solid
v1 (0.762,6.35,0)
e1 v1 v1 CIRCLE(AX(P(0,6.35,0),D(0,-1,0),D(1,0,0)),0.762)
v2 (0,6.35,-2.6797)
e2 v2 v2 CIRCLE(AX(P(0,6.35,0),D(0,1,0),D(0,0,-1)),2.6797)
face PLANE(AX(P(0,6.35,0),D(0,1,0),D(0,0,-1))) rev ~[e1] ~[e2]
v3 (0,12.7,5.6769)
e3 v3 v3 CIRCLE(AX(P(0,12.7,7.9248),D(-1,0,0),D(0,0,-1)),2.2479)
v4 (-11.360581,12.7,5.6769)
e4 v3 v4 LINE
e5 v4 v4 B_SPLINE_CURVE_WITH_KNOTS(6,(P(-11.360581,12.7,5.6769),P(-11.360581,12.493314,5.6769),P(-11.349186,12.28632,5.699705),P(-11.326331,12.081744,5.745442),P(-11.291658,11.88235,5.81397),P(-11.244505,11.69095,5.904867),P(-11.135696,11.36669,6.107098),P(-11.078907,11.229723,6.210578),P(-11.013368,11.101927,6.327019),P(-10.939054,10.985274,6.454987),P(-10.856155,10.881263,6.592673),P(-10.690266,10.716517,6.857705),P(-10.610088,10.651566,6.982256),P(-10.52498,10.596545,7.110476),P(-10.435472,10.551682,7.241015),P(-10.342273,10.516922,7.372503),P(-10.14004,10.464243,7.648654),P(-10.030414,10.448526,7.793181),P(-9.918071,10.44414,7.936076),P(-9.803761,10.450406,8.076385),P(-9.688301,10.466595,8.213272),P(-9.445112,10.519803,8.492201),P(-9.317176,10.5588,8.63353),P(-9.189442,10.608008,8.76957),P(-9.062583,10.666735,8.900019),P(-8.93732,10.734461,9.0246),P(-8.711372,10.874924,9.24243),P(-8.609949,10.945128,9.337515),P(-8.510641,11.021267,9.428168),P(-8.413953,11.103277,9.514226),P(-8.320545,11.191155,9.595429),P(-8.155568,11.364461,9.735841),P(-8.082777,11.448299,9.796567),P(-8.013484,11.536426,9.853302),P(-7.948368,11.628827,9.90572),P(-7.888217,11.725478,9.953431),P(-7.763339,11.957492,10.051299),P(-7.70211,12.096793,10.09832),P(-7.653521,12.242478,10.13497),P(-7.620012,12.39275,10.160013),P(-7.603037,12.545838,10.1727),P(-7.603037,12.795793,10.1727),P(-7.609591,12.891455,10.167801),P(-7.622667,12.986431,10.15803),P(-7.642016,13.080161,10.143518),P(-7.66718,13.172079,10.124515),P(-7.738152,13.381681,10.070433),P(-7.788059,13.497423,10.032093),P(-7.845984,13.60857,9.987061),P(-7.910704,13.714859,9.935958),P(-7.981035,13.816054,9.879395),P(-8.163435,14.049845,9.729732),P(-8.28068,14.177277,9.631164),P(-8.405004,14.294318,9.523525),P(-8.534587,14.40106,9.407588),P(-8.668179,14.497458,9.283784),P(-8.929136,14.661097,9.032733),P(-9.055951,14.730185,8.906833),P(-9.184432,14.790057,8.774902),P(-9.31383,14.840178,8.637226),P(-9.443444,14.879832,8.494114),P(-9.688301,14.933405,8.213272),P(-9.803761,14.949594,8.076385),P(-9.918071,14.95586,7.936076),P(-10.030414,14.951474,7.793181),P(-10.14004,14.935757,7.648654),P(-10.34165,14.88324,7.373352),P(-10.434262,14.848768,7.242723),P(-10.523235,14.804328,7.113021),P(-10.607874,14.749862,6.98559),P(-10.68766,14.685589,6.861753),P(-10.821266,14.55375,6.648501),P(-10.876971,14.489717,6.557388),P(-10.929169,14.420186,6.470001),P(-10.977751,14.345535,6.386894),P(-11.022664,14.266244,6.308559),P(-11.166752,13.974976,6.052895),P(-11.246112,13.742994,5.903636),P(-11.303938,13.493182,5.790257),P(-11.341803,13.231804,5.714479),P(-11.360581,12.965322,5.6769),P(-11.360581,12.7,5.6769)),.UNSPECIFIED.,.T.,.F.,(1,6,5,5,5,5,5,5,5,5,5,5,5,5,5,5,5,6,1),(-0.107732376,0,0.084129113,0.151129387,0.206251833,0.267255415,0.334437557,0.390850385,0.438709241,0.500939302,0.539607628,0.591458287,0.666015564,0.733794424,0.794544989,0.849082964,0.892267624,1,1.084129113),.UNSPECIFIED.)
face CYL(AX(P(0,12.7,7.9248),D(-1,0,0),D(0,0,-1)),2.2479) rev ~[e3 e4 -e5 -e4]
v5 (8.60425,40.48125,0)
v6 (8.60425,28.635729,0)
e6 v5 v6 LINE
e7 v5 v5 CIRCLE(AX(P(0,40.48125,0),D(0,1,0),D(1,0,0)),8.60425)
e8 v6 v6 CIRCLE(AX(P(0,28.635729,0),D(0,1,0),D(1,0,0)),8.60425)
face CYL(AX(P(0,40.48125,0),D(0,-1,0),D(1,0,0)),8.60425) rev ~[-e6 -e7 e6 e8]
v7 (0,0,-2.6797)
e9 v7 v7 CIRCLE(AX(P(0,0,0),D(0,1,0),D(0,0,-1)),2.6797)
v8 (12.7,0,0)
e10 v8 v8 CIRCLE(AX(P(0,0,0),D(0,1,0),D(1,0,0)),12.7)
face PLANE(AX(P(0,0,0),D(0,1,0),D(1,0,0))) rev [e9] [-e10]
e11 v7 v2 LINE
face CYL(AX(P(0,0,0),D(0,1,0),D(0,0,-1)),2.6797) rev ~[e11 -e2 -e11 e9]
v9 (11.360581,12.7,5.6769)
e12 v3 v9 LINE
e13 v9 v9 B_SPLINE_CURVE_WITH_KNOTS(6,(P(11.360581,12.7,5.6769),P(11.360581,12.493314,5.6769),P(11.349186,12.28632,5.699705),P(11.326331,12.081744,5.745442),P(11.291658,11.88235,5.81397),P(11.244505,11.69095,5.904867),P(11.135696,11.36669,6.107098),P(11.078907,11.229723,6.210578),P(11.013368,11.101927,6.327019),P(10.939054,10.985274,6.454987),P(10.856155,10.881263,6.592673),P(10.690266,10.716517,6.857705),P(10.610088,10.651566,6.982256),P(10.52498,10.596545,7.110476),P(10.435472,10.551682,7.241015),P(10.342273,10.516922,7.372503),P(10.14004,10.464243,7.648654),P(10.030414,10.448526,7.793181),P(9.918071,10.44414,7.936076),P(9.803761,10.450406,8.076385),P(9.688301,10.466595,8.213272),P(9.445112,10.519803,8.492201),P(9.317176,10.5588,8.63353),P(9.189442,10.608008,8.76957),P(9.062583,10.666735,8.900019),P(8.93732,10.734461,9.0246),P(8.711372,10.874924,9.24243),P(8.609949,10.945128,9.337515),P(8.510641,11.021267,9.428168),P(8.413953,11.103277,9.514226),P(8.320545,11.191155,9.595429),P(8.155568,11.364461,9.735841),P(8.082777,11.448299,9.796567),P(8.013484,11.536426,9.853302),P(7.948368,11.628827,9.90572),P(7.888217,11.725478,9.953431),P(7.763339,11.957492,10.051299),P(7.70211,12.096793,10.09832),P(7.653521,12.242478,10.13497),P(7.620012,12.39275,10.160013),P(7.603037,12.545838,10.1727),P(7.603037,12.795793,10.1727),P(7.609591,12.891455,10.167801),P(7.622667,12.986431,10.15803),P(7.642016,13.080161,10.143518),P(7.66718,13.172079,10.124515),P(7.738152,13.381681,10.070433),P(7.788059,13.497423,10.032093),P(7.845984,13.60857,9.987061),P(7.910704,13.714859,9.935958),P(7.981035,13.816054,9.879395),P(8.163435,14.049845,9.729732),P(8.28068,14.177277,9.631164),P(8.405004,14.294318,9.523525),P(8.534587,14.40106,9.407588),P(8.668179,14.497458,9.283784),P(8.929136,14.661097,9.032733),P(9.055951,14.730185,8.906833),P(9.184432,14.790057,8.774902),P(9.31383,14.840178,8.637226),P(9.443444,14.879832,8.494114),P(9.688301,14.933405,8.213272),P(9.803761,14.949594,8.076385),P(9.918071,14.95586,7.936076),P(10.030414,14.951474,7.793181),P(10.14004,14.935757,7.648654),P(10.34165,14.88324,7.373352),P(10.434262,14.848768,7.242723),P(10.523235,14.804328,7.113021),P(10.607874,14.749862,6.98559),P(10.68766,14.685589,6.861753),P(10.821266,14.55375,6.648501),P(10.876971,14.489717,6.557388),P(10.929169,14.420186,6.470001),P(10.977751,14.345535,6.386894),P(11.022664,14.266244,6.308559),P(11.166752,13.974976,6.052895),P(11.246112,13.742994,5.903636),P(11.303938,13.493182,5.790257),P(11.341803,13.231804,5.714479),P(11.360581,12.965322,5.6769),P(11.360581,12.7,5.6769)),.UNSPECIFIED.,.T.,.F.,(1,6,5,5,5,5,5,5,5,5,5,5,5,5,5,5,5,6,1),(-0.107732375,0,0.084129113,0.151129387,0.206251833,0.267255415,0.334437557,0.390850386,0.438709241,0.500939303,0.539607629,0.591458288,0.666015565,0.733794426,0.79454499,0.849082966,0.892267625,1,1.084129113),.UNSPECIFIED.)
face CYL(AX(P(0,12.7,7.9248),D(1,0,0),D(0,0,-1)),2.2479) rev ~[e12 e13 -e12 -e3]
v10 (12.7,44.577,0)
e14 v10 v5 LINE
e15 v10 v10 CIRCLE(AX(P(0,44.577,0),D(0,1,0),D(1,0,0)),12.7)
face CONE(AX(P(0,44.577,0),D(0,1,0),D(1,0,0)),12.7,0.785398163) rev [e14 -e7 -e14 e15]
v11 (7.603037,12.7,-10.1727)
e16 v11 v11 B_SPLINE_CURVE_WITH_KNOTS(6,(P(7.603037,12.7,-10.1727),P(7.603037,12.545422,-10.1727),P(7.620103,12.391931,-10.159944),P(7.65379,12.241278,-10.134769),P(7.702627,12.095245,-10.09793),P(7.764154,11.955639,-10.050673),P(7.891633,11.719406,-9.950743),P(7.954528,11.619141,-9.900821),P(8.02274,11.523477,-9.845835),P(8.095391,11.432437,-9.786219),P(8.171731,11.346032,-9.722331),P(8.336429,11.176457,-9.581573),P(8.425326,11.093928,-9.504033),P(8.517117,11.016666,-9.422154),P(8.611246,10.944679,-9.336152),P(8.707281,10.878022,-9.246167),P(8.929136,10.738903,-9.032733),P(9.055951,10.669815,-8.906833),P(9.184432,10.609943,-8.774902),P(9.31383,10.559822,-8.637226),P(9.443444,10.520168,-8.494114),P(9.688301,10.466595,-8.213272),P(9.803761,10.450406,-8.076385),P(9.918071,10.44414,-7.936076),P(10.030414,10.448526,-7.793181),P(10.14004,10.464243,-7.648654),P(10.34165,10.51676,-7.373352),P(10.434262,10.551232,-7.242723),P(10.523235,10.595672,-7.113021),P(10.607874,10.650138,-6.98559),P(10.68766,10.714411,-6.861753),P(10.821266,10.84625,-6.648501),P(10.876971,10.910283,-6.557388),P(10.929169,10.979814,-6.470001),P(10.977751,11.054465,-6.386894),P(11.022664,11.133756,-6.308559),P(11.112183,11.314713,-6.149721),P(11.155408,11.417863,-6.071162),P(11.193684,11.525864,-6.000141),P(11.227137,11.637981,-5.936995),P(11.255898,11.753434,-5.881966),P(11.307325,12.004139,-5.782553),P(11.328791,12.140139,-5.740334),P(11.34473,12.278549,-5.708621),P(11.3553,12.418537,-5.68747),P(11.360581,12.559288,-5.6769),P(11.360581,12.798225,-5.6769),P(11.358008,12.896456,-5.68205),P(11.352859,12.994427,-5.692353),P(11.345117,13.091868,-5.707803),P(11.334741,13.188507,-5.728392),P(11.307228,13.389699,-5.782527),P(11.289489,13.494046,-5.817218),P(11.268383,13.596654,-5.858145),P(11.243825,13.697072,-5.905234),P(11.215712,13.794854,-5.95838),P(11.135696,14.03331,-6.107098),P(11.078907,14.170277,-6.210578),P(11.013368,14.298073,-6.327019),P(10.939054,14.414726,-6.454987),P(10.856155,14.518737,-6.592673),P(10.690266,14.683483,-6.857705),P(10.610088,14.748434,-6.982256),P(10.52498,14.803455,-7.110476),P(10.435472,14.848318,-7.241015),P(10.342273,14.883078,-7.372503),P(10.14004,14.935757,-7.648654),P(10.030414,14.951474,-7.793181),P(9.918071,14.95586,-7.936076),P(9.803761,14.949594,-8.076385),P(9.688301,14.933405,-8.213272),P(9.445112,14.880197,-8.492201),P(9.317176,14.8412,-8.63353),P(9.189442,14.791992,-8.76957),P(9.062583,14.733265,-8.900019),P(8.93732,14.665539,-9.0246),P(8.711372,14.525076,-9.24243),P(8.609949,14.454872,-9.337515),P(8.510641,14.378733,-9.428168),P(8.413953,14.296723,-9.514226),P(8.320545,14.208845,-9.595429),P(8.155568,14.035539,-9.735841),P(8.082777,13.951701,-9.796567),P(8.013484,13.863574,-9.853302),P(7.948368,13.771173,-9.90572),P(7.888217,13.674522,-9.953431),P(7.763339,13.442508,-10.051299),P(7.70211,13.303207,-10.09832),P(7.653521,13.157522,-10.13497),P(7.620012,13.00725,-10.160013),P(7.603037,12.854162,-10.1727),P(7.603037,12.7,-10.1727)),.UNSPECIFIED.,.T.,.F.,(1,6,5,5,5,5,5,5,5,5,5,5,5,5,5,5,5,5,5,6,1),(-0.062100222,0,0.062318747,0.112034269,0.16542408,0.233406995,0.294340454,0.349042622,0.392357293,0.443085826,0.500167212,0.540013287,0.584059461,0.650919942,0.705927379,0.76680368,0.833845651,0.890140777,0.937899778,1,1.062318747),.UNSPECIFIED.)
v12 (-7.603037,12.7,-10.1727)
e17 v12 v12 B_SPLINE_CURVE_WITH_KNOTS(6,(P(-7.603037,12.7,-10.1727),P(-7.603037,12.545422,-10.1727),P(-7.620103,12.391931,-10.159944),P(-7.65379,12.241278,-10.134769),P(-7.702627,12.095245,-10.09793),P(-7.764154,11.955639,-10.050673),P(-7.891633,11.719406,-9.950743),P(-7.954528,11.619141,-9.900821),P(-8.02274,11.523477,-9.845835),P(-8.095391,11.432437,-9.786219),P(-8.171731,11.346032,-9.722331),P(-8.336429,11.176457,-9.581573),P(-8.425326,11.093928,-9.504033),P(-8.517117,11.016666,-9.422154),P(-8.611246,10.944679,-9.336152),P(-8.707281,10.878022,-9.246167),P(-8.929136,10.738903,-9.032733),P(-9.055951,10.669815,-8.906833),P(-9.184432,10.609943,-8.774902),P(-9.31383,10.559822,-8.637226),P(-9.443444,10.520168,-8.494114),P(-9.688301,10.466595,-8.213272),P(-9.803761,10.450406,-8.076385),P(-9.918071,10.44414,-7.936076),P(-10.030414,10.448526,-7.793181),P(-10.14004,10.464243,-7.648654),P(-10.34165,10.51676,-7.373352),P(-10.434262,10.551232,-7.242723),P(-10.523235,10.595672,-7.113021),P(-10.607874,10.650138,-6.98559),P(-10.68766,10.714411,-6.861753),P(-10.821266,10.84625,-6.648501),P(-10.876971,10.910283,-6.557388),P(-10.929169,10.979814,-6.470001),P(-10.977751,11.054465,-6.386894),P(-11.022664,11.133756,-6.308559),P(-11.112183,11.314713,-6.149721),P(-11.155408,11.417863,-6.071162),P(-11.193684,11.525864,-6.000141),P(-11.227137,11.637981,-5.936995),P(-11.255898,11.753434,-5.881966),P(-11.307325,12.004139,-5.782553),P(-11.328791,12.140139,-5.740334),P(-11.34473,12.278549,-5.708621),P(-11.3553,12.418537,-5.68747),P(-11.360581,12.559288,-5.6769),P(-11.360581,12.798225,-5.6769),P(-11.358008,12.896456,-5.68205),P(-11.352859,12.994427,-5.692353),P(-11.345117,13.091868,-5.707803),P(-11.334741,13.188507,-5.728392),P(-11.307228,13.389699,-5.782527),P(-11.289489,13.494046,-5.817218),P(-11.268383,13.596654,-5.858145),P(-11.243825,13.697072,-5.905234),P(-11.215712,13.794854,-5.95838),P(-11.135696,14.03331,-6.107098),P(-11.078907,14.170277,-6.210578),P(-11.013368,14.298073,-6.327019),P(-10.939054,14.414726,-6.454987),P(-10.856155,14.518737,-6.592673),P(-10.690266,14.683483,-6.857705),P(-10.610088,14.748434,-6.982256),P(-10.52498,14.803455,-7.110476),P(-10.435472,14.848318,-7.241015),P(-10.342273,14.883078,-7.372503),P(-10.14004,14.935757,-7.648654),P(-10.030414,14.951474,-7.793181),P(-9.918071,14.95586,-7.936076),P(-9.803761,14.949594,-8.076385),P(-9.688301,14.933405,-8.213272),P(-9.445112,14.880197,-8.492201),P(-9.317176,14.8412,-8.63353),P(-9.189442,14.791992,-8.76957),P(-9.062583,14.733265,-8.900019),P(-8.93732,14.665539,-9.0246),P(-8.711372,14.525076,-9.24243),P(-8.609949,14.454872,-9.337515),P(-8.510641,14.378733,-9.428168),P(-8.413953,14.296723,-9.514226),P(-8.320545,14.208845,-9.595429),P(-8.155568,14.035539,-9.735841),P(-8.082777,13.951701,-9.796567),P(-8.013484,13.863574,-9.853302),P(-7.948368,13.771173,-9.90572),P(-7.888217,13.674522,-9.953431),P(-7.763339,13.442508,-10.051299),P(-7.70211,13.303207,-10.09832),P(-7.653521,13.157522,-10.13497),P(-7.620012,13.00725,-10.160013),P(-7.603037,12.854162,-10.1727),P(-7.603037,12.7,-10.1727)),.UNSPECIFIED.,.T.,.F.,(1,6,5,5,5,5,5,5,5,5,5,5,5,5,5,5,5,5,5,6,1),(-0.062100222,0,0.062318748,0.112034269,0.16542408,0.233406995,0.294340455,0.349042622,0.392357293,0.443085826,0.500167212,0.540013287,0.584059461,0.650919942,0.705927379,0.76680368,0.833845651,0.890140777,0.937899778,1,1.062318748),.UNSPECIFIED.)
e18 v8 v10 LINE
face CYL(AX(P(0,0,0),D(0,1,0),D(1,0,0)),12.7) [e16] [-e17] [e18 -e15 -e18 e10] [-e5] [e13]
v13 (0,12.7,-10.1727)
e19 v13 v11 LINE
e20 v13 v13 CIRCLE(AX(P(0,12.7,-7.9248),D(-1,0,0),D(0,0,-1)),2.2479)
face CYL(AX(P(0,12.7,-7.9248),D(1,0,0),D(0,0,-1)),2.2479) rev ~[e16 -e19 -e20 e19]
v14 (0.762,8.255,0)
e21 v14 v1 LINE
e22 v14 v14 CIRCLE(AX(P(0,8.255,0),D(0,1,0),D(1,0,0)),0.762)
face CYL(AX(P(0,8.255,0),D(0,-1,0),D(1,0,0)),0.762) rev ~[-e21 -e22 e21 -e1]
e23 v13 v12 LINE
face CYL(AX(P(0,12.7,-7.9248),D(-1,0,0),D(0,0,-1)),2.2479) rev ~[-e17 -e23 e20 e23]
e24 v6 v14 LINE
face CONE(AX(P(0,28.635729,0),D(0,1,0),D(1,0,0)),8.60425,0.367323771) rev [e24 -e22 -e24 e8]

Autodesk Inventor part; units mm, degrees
ref_plane "YZ Plane" through (0, 0, 0) normal (1, 0, 0) x (0, 1, 0)
ref_plane "XZ Plane" through (0, 0, 0) normal (0, 1, 0) x (-1, 0, 0)
ref_plane "XY Plane" through (0, 0, 0) normal (0, 0, 1) x (1, 0, 0)
sketch "Sketch1" plane through (0, 0, 0) normal (0, 0, 1) x (1, 0, 0)
  line L0 (0, 0) -> (6.223, 0)
  line L1 (0, 0) -> (6.223, 0) construction
  line L2 (6.223, 0) -> (6.223, 38.1)
  line L3 (0, 0) -> (0.762, 0)
  line L4 (0.762, 0) -> (0.762, 8.255)
  line L5 (0.762, 8.255) -> (6.223, 28.635729)
  line L6 (6.223, 28.635729) -> (6.223, 38.1)
  line L7 (0, 0) -> (12.7, 0)
  line L8 (0, -8.9154) -> (0, 53.4924)
  line L9 (6.223, 38.1) -> (12.20332, 44.08032)
  line L10 (6.223, 38.1) -> (14.68045, 38.1) construction
  line L11 (12.20332, 44.08032) -> (12.7, 0)
  line L12 (12.7, 0) -> (12.7, 44.577)
  line L13 (12.7, 44.577) -> (6.223, 38.1)
  line L14 (6.223, 38.1) -> (0, 38.1)
  line L15 (0, 8.255) -> (0.762, 8.255)
  line L16 (0, 8.255) -> (0, 38.1)
  line L17 (6.223, 28.635729) -> (0, 28.635729)
  line L18 (0, 28.635729) -> (8.60425, 28.635729)
  line L19 (8.60425, 28.635729) -> (0.762, 8.255)
  line L20 (8.60425, 28.635729) -> (8.60425, 40.48125)
  dimension "d0" = 6.223
  dimension "d1" = 0
  dimension "d2" = 38.1
  dimension "d3" = 90
  dimension "d4" = 0.762
  dimension "d5" = 8.255
  dimension "d6" = 165
  dimension "d7" = 12.7
  dimension "d18" = 45
  dimension "d58" = 8.60425
sketch "Sketch1 outline for Revolution1" plane through (0, 0, 0) normal (0, 0, 1) x (1, 0, 0)
  line L0 (8.60425, 40.48125) -> (8.60425, 28.635729)
  line L1 (8.60425, 28.635729) -> (0.762, 8.255)
  line L2 (0.762, 8.255) -> (0.762, 0)
  line L3 (0.762, 0) -> (12.7, 0)
  line L4 (12.7, 0) -> (12.7, 44.577)
  line L5 (12.7, 44.577) -> (8.60425, 40.48125)
revolve "Revolution1" add sketch "Sketch1 outline for Revolution1" angle 360 about axis through (0, -10, 0) along (0, 1, 0)
sketch "Sketch3" plane through (0, 0, 0) normal (0, -1, 0) x (1, 0, 0)
  point P0 (0, 0)
  point P1 (0, 0)
hole "Hole2" at (0, 0, 0) direction (0, 1, 0) diameter 5.3594 depth 6.35 thread size "1/4-28 UNF" class "2B" standard "ANSI Unified Screw Threads"
sketch "Sketch4" plane through (0, 0, 0) normal (1, 0, 0) x (0, 1, 0)
  line L0 (0, 12.7) -> (0, -12.7) projected
  line L1 (0, 12.7) -> (0, 7.9248)
  line L2 (0, 7.9248) -> (12.7, 7.9248)
  line L3 (0, -12.7) -> (0, -7.9248)
  line L4 (0, -7.9248) -> (12.7, -7.9248)
  point P0 (0, 0)
  dimension "d28" = 4.7752
  dimension "d29" = 12.7
  dimension "d30" = 4.7752
  dimension "d31" = 12.7
  dimension "d32" = 90
hole "Hole3" at (0, 12.7, 7.9248) at (0, 12.7, -7.9248) direction (-1, 0, 0) diameter 4.4958 end through all clearance for "Socket Head Cap Screw" size "#8" standard "Ansi Unified Screw Threads"
mirror "Mirror1" about plane through (0, 0, 0) normal (1, 0, 0) of "Hole3"
equation "\"d47\" = 55deg"
equation "\"Sketch5_Pitch\" = 0.90714"
properties part number "catch vertical seal-tighttol-thread" material "Polystyrene"
